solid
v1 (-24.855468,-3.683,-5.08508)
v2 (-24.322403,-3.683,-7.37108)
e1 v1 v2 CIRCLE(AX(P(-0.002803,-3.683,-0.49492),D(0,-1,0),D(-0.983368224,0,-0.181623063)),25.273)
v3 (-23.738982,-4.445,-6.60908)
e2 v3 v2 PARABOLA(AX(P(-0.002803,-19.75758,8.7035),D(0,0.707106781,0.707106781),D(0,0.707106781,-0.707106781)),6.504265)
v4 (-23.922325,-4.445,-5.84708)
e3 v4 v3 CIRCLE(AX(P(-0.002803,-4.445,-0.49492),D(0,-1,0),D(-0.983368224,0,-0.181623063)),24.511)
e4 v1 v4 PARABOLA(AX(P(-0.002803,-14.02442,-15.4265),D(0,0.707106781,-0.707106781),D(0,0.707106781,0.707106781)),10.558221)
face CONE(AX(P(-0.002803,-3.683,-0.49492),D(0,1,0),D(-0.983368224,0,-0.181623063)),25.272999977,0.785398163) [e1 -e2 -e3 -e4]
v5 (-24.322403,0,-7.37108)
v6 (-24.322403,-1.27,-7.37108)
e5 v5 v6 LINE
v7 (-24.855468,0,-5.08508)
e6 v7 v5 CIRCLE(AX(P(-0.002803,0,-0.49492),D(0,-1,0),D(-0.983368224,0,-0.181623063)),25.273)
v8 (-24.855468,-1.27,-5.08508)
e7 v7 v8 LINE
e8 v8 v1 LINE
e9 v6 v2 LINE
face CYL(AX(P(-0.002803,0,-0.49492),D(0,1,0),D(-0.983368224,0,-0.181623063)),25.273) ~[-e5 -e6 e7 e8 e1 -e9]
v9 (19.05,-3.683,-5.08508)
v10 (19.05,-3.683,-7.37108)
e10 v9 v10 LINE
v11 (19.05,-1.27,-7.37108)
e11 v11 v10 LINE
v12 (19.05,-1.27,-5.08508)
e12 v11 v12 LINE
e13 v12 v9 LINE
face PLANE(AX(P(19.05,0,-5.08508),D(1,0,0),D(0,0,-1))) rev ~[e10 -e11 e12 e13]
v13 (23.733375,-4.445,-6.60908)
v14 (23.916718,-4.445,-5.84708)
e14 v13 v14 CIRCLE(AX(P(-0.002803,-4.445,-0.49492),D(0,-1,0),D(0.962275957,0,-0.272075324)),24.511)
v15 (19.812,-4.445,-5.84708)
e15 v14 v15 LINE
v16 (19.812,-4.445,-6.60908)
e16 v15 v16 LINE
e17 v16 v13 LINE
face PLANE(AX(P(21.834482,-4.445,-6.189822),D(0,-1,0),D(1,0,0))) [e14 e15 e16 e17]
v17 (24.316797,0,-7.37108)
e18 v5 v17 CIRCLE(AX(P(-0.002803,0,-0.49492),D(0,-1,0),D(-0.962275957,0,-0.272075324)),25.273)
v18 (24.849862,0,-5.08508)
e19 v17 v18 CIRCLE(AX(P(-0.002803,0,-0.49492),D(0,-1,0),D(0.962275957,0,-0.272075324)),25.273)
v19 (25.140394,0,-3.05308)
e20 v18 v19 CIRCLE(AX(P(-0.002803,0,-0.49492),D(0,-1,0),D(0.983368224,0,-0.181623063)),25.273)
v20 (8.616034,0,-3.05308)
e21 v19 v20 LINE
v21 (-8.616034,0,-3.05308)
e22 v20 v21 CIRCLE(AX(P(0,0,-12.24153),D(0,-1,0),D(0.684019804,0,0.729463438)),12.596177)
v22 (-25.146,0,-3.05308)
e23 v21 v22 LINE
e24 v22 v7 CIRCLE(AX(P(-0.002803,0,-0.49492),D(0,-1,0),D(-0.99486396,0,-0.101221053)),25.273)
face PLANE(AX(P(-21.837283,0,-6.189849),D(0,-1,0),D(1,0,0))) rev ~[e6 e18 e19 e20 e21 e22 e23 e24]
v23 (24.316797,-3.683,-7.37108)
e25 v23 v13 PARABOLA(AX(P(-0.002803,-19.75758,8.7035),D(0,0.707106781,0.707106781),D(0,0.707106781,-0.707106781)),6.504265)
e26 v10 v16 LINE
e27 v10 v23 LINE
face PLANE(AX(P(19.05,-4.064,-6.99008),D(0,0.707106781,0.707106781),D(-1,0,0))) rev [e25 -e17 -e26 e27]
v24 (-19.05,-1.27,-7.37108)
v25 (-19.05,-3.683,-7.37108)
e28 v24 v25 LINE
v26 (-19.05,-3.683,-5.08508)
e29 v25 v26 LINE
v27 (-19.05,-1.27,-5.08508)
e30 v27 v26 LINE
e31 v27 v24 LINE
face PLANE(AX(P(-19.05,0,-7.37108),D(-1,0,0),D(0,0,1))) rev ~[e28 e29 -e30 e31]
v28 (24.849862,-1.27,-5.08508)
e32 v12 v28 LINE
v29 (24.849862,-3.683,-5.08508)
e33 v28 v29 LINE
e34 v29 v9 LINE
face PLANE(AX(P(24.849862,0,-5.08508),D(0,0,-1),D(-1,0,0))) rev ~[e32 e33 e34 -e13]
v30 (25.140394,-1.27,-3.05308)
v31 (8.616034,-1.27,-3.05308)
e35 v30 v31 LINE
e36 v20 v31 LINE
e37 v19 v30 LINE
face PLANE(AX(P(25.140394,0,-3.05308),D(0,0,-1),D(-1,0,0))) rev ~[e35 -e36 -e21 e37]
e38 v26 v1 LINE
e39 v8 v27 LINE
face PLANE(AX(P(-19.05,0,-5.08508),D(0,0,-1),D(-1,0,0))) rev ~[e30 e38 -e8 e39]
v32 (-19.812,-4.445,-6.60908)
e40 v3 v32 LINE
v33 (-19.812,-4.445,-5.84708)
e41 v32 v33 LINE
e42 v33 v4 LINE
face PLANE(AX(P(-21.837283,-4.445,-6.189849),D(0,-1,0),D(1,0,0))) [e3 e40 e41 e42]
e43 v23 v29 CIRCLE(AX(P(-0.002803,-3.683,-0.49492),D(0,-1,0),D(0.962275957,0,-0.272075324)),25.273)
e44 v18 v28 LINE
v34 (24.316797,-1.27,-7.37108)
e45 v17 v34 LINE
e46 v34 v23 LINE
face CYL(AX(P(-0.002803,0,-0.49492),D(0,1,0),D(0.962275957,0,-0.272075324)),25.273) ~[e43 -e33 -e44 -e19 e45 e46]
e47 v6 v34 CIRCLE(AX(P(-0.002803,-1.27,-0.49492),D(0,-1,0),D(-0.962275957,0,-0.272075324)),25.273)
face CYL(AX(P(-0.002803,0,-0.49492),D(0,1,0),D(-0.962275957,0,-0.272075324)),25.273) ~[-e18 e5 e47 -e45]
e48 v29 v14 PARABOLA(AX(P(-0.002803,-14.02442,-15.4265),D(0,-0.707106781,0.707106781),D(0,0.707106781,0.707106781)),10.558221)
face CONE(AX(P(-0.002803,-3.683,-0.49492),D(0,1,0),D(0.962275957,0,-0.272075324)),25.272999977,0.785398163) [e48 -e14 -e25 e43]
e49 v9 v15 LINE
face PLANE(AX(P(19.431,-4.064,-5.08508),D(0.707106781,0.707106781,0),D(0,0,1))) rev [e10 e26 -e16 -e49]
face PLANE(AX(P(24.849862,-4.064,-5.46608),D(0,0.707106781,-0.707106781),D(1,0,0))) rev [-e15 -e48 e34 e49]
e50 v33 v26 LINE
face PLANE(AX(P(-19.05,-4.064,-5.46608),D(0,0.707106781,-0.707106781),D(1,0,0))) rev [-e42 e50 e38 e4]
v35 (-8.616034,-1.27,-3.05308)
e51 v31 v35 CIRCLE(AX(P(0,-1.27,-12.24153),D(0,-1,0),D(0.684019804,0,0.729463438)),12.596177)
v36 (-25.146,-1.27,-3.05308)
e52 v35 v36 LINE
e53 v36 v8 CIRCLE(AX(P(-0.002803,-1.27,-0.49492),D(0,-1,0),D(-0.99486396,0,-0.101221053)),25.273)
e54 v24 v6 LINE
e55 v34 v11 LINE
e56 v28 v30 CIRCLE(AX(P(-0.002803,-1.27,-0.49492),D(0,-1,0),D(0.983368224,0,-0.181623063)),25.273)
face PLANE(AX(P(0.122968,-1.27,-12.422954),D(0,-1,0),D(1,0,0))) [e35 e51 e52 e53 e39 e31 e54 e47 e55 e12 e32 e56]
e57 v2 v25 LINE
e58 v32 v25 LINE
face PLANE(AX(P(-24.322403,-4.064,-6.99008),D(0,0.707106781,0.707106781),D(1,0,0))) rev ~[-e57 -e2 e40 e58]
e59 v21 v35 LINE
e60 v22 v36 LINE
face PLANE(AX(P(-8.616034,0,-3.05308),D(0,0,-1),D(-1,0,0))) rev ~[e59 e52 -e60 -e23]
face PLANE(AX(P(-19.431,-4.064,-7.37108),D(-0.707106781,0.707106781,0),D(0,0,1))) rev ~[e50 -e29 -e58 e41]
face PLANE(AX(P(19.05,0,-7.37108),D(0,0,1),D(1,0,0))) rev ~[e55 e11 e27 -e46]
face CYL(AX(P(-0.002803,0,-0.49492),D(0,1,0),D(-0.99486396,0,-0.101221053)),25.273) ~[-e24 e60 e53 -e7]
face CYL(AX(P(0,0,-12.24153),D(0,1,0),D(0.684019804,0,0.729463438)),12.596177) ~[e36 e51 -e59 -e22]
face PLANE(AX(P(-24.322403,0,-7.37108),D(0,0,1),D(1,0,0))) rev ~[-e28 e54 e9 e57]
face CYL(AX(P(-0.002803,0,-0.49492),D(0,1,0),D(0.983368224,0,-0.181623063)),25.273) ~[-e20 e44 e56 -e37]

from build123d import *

# Parameters (mm, degrees)
F1_DEPTH = 1.27
F2_DEPTH = 4.445
F3_SIZE2 = 0.762
F3_SIZE  = 0.762


# Not quite as in the source:
# - a feature names something its author has since deleted; it is built from what else it names


with BuildPart() as f1:
    # F0 (on Front) → F1 (new body)
    with BuildSketch(Plane.XZ):
        with BuildLine():
            Line((-8.6160342025, -3.05308), (-25.146, -3.05308))
            ThreePointArc((-25.146, -3.05308), (-25.0213724382, -4.0720308287), (-24.855468258, -5.08508))
            Line((-24.855468258, -5.08508), (-19.05, -5.08508))
            Line((-19.05, -5.08508), (-19.05, -7.37108))
            Line((-19.05, -7.37108), (-24.3224034139, -7.37108))
            ThreePointArc((-24.3224034139, -7.37108), (-0.002803144, -25.7679203368), (24.3167971258, -7.37108))
            Line((24.3167971258, -7.37108), (19.05, -7.37108))
            Line((19.05, -7.37108), (19.05, -5.08508))
            Line((19.05, -5.08508), (24.8498619699, -5.08508))
            ThreePointArc((24.8498619699, -5.08508), (25.0157661502, -4.0720308287), (25.1403937119, -3.05308))
            Line((25.1403937119, -3.05308), (8.6160342025, -3.05308))
            ThreePointArc((8.6160342025, -3.05308), (11.5583898274, -7.2348059893), (12.5961765249, -12.2415302321))
            ThreePointArc((12.5961765249, -12.2415302321), (-5.0067242428, -23.7999200595), (-8.6160342025, -3.05308))
        make_face()
        with BuildLine():
            Line((8.6160342025, -3.05308), (-8.6160342025, -3.05308))
            ThreePointArc((-8.6160342025, -3.05308), (-5.0067242428, -23.7999200595), (12.5961765249, -12.2415302321))
            ThreePointArc((12.5961765249, -12.2415302321), (11.5583898274, -7.2348059893), (8.6160342025, -3.05308))
        make_face()
        with BuildLine():
            ThreePointArc((8.6160342025, -3.05308), (0, 0.3546462928), (-8.6160342025, -3.05308))
            Line((-8.6160342025, -3.05308), (8.6160342025, -3.05308))
        make_face()
    extrude(amount=F1_DEPTH)

    # F0 (on Front) → F2 (join)
    with BuildSketch(Plane.XZ):
        with BuildLine():
            Line((-19.05, -5.08508), (-24.855468258, -5.08508))
            ThreePointArc((-24.855468258, -5.08508), (-24.6154903144, -6.2342721517), (-24.3224034139, -7.37108))
            Line((-24.3224034139, -7.37108), (-19.05, -7.37108))
            Line((-19.05, -7.37108), (-19.05, -5.08508))
        make_face()
        with BuildLine():
            Line((19.05, -7.37108), (24.3167971258, -7.37108))
            ThreePointArc((24.3167971258, -7.37108), (24.6098840263, -6.2342721517), (24.8498619699, -5.08508))
            Line((24.8498619699, -5.08508), (19.05, -5.08508))
            Line((19.05, -5.08508), (19.05, -7.37108))
        make_face()
    extrude(amount=F2_DEPTH)

    # F3
    f3_edges = [f1.edges().sort_by_distance(p)[0] for p in [
        (21.949931, -4.445, -5.08508),
        (19.05, -4.445, -6.22808),
        (21.683399, -4.445, -7.37108),
        (24.609884, -4.445, -6.234272),
        (-21.686202, -4.445, -7.37108),
        (-24.61549, -4.445, -6.234272),
        (-19.05, -4.445, -6.22808),
        (-21.952734, -4.445, -5.08508),
    ]]
    chamfer(f3_edges, length=F3_SIZE, length2=F3_SIZE2)


solid = f1.part
